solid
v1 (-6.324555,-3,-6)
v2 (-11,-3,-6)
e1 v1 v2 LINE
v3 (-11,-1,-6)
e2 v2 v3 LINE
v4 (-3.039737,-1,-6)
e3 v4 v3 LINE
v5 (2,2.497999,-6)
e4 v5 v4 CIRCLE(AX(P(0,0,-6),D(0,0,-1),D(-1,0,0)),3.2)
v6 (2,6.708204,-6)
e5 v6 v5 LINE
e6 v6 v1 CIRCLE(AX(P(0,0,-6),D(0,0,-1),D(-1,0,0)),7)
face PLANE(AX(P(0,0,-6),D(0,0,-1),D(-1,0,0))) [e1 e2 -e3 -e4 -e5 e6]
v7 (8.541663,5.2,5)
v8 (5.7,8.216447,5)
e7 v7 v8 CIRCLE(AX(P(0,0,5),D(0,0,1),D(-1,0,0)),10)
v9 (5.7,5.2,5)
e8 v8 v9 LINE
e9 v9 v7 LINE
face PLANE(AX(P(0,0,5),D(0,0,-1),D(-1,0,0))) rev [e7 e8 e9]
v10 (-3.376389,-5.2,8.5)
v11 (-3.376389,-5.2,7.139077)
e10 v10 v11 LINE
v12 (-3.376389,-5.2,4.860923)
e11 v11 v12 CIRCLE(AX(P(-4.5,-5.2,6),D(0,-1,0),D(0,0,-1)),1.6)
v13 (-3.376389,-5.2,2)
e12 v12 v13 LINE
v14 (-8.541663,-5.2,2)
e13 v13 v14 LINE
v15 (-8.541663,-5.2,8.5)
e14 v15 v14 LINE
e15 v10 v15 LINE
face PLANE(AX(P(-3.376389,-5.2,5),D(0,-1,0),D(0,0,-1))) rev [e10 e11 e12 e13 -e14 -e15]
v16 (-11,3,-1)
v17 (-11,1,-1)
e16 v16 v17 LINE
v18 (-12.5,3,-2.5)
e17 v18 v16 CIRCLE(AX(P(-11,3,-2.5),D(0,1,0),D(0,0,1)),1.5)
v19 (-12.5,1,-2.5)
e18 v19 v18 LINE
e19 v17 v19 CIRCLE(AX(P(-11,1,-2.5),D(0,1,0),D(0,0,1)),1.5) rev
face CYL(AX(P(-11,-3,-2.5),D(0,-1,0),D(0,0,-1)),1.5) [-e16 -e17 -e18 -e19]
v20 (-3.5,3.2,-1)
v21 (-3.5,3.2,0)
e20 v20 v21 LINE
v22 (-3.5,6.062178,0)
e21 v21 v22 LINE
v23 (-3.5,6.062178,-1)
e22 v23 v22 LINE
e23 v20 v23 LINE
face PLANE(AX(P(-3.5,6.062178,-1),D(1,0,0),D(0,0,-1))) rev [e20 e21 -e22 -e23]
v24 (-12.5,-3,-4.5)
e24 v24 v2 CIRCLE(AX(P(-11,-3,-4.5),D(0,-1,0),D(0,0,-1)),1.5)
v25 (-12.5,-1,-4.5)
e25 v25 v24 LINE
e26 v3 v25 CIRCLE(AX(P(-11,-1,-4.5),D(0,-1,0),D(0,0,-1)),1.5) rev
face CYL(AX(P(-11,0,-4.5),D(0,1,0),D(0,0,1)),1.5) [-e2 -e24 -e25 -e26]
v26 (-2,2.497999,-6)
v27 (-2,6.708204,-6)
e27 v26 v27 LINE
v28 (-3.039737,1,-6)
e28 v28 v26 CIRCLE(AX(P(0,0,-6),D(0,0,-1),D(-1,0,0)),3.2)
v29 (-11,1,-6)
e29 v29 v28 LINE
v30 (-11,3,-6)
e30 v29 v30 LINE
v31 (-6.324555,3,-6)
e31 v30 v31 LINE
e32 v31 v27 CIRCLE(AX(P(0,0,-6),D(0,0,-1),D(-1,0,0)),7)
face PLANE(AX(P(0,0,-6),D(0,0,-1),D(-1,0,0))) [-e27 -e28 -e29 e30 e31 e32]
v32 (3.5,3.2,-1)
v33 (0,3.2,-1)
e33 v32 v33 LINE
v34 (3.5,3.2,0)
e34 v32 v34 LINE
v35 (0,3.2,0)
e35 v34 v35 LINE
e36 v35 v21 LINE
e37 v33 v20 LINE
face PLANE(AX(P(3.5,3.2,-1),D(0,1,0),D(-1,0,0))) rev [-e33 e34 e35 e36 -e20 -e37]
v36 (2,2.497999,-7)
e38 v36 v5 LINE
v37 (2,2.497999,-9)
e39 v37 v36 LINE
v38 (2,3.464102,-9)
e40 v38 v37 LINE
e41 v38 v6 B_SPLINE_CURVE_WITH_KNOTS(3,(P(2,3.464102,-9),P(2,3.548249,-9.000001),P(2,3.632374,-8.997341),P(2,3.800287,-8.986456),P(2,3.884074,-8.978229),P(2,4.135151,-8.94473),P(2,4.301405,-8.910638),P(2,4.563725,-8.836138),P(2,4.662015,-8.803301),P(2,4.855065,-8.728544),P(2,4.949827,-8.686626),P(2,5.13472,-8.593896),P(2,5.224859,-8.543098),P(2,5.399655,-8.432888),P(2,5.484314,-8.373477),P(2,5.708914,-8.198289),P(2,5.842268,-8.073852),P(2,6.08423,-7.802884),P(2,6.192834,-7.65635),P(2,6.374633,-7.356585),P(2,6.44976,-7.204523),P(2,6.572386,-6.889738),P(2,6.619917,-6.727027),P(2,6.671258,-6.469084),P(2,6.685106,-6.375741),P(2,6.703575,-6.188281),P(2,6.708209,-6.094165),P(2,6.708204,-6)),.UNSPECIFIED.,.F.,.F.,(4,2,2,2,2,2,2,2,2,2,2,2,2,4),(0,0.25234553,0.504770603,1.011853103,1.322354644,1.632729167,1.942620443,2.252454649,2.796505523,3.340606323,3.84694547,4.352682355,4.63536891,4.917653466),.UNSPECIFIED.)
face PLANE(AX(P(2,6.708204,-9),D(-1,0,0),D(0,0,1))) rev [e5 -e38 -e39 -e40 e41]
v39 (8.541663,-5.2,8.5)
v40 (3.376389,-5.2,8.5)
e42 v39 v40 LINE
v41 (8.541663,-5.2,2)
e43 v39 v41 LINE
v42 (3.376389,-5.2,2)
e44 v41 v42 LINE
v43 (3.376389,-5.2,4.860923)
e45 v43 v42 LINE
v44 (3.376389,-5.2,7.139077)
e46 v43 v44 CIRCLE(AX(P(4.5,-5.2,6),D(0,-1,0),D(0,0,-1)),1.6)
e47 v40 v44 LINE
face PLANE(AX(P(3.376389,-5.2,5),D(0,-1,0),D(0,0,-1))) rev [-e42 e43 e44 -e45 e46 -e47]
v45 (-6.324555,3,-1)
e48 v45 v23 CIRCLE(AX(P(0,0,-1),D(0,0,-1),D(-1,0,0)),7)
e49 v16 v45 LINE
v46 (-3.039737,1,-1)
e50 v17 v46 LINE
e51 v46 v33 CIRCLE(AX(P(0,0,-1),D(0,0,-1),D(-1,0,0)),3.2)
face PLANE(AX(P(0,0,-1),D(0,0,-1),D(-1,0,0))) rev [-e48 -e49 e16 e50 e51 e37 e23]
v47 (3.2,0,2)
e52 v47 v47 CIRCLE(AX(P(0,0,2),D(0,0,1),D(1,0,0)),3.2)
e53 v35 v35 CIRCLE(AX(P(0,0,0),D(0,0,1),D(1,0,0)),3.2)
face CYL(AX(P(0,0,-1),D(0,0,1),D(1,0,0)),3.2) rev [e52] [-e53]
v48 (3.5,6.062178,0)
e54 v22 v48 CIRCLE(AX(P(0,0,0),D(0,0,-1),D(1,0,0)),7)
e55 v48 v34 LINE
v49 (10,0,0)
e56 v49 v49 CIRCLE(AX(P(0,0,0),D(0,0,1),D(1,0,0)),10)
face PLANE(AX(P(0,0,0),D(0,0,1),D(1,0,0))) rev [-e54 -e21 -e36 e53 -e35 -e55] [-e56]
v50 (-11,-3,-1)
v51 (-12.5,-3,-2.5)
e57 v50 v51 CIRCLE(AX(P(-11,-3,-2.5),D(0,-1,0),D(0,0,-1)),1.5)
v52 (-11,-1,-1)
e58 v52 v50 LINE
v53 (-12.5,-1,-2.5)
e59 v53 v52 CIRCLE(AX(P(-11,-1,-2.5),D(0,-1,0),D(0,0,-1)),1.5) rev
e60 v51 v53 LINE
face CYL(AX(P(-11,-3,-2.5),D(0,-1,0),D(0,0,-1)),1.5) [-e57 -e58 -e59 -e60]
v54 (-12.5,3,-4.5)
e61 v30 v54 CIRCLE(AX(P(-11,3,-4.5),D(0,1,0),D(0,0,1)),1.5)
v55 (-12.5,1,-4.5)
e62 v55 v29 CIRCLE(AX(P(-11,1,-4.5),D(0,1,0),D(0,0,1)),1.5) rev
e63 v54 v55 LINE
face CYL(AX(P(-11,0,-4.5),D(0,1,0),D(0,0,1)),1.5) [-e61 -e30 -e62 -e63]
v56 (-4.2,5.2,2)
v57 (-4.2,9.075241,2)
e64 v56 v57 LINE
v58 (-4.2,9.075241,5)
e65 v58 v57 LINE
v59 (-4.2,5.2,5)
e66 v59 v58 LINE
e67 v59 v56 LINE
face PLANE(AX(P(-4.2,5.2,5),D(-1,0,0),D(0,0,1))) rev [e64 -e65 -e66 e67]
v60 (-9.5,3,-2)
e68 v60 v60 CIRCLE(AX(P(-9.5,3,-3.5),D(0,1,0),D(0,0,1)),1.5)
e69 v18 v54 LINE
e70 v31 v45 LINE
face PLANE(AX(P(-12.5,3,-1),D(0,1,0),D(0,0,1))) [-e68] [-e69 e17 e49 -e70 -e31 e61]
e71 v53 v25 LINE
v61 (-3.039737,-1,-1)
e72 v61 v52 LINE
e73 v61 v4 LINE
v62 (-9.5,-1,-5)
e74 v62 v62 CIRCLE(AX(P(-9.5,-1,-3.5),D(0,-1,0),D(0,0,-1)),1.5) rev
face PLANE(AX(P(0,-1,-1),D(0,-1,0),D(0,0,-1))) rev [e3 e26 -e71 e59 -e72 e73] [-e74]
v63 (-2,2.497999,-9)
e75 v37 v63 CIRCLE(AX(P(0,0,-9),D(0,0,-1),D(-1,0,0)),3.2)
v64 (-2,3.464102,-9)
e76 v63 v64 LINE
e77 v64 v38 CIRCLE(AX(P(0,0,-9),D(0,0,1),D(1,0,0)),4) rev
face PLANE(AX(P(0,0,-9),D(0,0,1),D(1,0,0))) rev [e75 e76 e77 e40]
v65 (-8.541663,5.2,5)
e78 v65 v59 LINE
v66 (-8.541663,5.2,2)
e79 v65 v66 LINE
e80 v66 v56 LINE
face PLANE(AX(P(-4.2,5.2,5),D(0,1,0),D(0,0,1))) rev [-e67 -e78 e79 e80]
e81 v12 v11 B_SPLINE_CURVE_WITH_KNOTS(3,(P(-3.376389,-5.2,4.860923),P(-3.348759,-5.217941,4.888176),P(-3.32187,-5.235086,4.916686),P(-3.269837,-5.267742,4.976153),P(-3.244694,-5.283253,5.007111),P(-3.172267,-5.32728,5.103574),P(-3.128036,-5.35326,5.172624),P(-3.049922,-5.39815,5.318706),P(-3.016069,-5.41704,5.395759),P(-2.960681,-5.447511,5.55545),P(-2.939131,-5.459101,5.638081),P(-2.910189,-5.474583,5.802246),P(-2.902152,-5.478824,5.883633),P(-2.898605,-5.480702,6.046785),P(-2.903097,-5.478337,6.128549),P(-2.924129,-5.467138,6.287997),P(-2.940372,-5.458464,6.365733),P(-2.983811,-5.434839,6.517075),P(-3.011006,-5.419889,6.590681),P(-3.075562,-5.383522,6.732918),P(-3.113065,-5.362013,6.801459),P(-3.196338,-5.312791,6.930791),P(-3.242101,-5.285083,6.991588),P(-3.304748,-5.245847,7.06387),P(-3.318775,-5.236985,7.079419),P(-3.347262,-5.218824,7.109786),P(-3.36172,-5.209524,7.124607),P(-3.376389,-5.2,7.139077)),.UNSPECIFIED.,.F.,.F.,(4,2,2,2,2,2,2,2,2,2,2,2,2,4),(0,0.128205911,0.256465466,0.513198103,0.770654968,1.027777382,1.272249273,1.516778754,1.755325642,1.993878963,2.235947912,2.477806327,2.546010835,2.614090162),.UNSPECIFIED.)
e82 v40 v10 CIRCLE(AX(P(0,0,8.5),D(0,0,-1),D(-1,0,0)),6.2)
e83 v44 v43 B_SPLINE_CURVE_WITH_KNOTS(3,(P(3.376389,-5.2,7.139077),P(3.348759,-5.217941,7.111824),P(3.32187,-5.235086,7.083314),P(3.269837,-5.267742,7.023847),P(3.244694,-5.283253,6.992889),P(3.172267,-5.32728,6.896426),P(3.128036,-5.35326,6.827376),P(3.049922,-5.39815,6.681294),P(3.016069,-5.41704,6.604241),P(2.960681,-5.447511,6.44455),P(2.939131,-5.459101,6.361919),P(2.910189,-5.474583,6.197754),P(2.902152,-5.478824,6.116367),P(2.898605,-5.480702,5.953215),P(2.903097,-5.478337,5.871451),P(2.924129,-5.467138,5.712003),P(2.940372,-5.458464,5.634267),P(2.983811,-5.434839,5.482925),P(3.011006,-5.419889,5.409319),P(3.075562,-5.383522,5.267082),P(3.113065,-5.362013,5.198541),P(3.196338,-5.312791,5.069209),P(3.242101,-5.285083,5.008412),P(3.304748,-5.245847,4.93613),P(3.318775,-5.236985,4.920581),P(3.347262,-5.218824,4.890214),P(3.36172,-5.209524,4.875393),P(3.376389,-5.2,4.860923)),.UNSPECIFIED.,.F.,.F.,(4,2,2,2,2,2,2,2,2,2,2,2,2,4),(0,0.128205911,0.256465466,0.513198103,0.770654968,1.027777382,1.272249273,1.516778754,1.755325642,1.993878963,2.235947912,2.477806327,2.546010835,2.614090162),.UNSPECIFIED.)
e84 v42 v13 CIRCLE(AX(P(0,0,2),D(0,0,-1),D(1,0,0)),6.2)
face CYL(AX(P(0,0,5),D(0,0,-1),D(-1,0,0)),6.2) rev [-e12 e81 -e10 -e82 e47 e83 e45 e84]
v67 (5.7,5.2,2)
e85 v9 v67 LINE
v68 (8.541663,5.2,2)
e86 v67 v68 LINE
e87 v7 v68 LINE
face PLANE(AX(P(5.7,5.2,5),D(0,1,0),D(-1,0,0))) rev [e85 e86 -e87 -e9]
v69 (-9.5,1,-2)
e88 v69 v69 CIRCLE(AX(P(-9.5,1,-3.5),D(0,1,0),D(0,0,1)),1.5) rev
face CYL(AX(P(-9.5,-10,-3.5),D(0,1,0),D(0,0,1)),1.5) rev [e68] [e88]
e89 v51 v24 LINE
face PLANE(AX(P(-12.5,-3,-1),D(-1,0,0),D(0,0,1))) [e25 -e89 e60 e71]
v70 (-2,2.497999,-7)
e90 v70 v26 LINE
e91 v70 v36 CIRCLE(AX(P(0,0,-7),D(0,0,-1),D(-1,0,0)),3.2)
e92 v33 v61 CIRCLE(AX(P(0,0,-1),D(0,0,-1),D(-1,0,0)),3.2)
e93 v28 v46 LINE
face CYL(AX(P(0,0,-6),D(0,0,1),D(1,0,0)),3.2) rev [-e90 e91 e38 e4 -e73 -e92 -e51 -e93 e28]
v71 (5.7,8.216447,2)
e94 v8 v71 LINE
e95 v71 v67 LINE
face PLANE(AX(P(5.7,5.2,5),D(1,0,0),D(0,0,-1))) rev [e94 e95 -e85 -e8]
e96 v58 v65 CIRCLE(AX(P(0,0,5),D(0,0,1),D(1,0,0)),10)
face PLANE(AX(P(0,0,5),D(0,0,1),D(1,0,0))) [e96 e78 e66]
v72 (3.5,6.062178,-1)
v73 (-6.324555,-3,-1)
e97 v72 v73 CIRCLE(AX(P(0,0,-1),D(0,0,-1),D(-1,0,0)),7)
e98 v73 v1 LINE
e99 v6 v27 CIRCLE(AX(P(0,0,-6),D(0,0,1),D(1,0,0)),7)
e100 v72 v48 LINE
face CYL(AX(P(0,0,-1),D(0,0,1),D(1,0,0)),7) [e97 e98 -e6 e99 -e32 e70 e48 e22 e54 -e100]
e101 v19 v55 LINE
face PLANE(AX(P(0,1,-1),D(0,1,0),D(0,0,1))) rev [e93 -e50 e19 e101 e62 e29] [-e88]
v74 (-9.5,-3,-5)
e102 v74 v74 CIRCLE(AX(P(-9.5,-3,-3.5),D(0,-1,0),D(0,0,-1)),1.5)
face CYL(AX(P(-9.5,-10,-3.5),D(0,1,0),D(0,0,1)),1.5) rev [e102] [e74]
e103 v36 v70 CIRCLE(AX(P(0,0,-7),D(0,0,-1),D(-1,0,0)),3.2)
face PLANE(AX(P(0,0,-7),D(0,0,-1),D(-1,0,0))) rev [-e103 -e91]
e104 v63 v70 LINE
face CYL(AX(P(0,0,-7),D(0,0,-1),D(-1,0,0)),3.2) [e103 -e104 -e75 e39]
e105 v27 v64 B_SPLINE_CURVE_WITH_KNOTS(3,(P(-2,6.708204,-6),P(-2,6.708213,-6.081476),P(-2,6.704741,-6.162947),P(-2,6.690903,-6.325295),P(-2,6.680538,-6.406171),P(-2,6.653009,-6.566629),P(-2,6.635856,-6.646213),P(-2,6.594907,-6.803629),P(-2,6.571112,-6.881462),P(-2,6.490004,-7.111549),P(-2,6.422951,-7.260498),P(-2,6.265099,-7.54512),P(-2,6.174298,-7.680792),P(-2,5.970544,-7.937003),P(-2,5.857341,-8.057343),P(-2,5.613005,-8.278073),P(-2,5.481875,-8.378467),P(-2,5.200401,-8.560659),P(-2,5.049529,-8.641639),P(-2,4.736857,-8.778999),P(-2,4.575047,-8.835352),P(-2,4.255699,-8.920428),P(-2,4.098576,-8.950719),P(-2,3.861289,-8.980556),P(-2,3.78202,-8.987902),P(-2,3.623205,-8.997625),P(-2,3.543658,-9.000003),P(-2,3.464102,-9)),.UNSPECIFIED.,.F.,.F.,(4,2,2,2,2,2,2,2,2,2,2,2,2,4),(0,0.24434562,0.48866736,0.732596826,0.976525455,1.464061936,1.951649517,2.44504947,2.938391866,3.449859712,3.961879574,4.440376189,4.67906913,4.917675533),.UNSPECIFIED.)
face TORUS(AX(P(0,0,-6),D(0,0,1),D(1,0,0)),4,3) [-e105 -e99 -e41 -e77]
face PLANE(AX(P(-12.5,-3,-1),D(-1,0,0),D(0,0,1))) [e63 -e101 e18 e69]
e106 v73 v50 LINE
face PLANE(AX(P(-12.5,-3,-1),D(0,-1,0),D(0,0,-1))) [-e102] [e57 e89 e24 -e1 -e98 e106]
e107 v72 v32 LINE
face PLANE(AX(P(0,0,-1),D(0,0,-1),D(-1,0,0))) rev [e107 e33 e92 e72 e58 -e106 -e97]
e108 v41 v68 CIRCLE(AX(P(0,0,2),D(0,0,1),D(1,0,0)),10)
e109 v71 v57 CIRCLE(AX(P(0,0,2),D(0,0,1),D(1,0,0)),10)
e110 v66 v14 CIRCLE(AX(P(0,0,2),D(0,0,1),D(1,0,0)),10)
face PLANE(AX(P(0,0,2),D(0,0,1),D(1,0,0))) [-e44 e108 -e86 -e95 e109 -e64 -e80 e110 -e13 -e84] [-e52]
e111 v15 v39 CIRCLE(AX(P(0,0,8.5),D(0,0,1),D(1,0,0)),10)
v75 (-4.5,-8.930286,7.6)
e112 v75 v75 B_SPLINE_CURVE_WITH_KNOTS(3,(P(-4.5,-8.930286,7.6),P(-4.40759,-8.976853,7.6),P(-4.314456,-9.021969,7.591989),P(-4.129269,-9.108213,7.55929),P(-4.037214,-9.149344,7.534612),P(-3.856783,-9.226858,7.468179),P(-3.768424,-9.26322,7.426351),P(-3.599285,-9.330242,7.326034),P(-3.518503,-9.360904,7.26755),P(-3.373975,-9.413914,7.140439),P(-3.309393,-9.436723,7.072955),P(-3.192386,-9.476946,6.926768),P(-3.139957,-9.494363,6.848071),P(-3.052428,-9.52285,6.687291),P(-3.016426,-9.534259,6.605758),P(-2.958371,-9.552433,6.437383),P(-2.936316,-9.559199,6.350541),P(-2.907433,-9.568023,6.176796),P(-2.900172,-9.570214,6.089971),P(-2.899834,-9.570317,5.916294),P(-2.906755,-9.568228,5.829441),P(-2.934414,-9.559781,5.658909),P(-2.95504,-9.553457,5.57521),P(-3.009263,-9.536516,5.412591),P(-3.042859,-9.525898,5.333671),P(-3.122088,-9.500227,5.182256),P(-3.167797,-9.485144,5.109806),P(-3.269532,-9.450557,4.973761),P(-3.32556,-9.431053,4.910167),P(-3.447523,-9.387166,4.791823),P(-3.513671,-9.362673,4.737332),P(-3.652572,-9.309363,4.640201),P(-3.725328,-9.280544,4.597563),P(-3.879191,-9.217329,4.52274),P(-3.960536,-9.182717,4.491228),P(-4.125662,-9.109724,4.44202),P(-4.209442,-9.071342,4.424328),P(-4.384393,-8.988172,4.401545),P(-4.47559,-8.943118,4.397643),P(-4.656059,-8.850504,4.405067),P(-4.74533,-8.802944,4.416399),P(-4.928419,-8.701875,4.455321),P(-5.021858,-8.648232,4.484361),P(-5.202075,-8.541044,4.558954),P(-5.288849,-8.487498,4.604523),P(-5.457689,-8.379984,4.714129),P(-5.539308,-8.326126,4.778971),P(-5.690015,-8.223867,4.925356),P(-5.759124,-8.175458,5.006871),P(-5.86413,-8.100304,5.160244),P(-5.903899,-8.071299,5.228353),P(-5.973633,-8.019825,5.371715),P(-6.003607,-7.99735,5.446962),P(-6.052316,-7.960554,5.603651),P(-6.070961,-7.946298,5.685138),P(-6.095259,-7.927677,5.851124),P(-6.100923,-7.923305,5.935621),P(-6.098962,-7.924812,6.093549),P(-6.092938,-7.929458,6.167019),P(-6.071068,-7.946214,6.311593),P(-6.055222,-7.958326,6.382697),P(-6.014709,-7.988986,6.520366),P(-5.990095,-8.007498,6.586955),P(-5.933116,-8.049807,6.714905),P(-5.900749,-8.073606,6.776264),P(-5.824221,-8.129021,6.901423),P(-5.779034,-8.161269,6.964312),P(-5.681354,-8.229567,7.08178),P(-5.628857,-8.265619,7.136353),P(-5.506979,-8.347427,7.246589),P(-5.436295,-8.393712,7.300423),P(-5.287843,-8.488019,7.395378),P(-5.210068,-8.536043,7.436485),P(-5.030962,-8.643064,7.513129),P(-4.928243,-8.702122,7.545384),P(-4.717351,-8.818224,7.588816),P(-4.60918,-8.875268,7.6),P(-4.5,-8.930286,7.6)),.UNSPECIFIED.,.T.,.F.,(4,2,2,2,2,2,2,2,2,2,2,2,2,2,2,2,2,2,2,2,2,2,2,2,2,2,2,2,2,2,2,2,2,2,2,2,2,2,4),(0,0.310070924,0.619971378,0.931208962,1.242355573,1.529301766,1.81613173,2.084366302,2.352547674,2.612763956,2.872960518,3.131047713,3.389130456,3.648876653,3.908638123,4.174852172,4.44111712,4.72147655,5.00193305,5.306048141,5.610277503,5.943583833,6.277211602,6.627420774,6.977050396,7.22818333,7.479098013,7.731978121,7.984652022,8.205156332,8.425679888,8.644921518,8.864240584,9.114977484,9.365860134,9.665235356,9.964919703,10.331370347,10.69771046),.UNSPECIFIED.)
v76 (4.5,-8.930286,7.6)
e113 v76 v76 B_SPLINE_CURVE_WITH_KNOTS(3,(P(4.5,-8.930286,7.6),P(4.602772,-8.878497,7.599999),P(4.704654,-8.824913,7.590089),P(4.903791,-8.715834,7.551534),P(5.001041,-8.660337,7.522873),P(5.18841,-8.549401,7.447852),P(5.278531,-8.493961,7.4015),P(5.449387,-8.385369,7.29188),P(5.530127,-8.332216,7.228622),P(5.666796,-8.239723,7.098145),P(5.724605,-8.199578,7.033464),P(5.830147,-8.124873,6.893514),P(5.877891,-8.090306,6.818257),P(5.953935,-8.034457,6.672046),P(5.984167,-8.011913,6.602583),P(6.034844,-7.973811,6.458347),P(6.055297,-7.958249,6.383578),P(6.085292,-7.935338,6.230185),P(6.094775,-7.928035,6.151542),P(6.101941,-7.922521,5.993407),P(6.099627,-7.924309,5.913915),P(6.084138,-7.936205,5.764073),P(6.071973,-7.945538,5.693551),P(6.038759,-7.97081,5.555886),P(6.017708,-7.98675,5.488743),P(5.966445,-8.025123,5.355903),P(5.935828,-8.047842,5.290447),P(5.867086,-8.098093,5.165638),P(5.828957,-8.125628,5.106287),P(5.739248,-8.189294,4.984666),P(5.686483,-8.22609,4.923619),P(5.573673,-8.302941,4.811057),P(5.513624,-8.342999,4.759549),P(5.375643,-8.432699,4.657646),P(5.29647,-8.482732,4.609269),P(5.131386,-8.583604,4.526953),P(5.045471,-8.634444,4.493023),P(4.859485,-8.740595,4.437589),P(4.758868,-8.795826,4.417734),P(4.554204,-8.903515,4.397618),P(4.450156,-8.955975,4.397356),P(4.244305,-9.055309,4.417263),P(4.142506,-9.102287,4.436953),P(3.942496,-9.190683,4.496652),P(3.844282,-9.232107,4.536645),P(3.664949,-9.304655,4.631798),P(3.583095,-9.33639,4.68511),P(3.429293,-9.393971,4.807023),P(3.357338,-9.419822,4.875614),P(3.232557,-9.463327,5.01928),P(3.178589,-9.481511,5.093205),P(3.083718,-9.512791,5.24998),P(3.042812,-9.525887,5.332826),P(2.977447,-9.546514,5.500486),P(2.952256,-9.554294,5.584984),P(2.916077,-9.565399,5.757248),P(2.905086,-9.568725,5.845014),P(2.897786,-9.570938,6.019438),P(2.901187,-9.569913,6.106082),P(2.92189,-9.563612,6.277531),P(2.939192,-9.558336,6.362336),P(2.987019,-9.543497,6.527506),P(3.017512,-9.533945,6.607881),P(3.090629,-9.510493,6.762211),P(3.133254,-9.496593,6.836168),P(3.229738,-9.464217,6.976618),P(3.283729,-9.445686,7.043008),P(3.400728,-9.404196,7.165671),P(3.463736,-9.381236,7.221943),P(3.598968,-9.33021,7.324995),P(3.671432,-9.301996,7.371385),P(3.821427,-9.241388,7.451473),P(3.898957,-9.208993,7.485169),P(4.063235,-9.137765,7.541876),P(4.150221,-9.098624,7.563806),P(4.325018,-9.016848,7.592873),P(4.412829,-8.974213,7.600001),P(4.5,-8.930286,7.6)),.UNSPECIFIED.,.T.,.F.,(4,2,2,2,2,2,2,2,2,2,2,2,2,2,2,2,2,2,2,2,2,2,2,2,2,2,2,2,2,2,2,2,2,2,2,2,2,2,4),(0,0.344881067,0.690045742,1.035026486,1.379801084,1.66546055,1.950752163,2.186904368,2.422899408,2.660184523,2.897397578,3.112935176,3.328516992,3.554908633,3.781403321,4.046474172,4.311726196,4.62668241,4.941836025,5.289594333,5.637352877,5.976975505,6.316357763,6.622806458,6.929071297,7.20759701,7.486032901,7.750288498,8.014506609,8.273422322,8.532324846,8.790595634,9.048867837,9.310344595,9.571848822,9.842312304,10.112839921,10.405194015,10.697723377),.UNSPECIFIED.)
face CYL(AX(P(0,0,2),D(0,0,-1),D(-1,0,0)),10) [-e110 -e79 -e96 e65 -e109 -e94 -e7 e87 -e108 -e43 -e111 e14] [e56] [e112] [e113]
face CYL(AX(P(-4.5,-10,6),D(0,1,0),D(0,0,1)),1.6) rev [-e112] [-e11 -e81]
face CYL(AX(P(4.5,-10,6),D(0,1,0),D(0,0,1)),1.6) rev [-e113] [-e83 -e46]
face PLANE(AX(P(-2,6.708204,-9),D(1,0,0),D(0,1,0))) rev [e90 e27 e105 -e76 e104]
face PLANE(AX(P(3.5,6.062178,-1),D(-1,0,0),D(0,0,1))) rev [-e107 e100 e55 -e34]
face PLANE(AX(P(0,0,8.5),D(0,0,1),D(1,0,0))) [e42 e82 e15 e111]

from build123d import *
from build123d.topology import SkipClean

# Parameters (mm, degrees)
SKETCH_1_R          = 10
EXTRUDE_1_DEPTH     = 2
EXTRUDE_2_DEPTH     = 3
SKETCH_3_R          = 3.2
CUT_EXTRUDE_1_DEPTH = 3
EXTRUDE_3_DEPTH     = 1
SKETCH_6_R          = 7
SKETCH_6_R_2        = 3.2
EXTRUDE_4_DEPTH     = 5
SKETCH_7_W          = 8.062767077
SKETCH_7_H          = 6
EXTRUDE_5_DEPTH     = 5
SKETCH_8_R          = 1.5
CUT_EXTRUDE_3_DEPTH = 20.006577809
CUT_EXTRUDE_4_DEPTH = 5
FILLET_7_R          = 1.5
EXTRUDE_6_DEPTH     = 3
EXTRUDE_START       = -2
SKETCH_12_R         = 3.2
EXTRUDE_7_DEPTH     = 2
FILLET_8_R          = 3
EXTRUDE_8_DEPTH     = 3.5
SKETCH_14_R         = 1.6
CUT_EXTRUDE_5_DEPTH = 22.640009284


with BuildPart() as part:
    # 草图1 → 凸台-拉伸1 (new body)
    with BuildSketch(Plane.XY):
        Circle(SKETCH_1_R)
    extrude(amount=EXTRUDE_1_DEPTH)

    # 草图2 → 凸台-拉伸2 (add)
    with SkipClean():  # the faces are left unmerged after this step: merging them gives an invalid solid
        with BuildSketch(Plane.XY.offset(2)):
            with BuildLine():
                Line((3.376388603, -5.2), (8.541662602, -5.2))
                ThreePointArc((8.541662602, -5.2), (6.403471398, -7.680856336), (3.578411207, -9.337824866))
                ThreePointArc((3.578411207, -9.337824866), (-0.425231333, -9.990954825), (-4.358898944, -9))
                ThreePointArc((-4.358898944, -9), (-6.724293423, -7.401613199), (-8.541662602, -5.2))
                Line((-8.541662602, -5.2), (-3.376388603, -5.2))
                ThreePointArc((-3.376388603, -5.2), (0, -6.2), (3.376388603, -5.2))
            make_face()
            with BuildLine():
                Line((-4.2, 5.2), (-8.541662602, 5.2))
                ThreePointArc((-8.541662602, 5.2), (-6.658968745, 7.460438007), (-4.2, 9.075241044))
                Line((-4.2, 9.075241044), (-4.2, 5.2))
            make_face()
            with BuildLine():
                Line((5.7, 5.2), (8.541662602, 5.2))
                ThreePointArc((8.541662602, 5.2), (7.278803227, 6.857041897), (5.7, 8.216446921))
                Line((5.7, 8.216446921), (5.7, 5.2))
            make_face()
        extrude(amount=EXTRUDE_2_DEPTH)

    # 草图3 → 切除-拉伸1 (cut)
    with SkipClean():  # the faces are left unmerged after this step: merging them gives an invalid solid
        with BuildSketch(Plane.XY.offset(2)):
            Circle(SKETCH_3_R)
        extrude(amount=-CUT_EXTRUDE_1_DEPTH, mode=Mode.SUBTRACT)

    # 草图5 → 凸台-拉伸3 (add)
    with SkipClean():  # the faces are left unmerged after this step: merging them gives an invalid solid
        with BuildSketch(Plane(origin=(0, 0, 0), x_dir=(-1, 0, 0), z_dir=(0, 0, -1))):
            with BuildLine():
                Line((-3.5, 6.062177826), (-3.5, 3.2))
                Line((-3.5, 3.2), (3.5, 3.2))
                Line((3.5, 3.2), (3.5, 6.062177826))
                ThreePointArc((3.5, 6.062177826), (0, 7), (-3.5, 6.062177826))
            make_face()
        extrude(amount=EXTRUDE_3_DEPTH)

    # 草图6 → 凸台-拉伸4 (add)
    with SkipClean():  # the faces are left unmerged after this step: merging them gives an invalid solid
        with BuildSketch(Plane(origin=(0, 0, -1), x_dir=(-1, 0, 0), z_dir=(0, 0, -1))):
            with Locations(Location((0, 0, 0), (0, 0, 120))):
                Circle(SKETCH_6_R)
            with Locations(Location((0, 0, 0), (0, 0, 180))):
                Circle(SKETCH_6_R_2, mode=Mode.SUBTRACT)
        extrude(amount=EXTRUDE_4_DEPTH)

    # 草图7 → 凸台-拉伸5 (add)
    with SkipClean():  # the faces are left unmerged after this step: merging them gives an invalid solid
        with BuildSketch(Plane(origin=(0, 0, -6), x_dir=(-1, 0, 0), z_dir=(0, 0, -1))):
            with Locations((8.468616461, 0)):
                Rectangle(SKETCH_7_W, SKETCH_7_H)
        extrude(amount=-EXTRUDE_5_DEPTH)

    # 草图8 → 切除-拉伸3 (cut, through all)
    with SkipClean():  # the faces are left unmerged after this step: merging them gives an invalid solid
        with BuildSketch(Plane(origin=(0, 3, 0), x_dir=(1, 0, 0), z_dir=(0, 1, 0))):
            with Locations(Location((-9.5, 3.5, 0), (0, 0, 270))):
                Circle(SKETCH_8_R)
        extrude(amount=-CUT_EXTRUDE_3_DEPTH, mode=Mode.SUBTRACT)

    # 草图9 → 切除-拉伸4 (cut)
    with SkipClean():  # the faces are left unmerged after this step: merging them gives an invalid solid
        with BuildSketch(Plane(origin=(0, 0, -6), x_dir=(-1, 0, 0), z_dir=(0, 0, -1))):
            Polygon((0, 0), (0, 1), (12.5, 1), (12.5, -1), (0, -1), align=None)
        extrude(amount=-CUT_EXTRUDE_4_DEPTH, mode=Mode.SUBTRACT)

    # 圆角7
    fillet_7_edges = [part.edges().sort_by_distance(p)[0] for p in [
        (-12.5, 2, -1),
        (-12.5, -2, -1),
        (-12.5, -2, -6),
        (-12.5, 2, -6),
    ]]
    fillet(fillet_7_edges, radius=FILLET_7_R)

    # 草图10 → 凸台-拉伸6 (add)
    with BuildSketch(Plane(origin=(0, 0, -6), x_dir=(-1, 0, 0), z_dir=(0, 0, -1))):
        with BuildLine():
            Line((2, 6.708203932), (2, 2.497999199))
            ThreePointArc((2, 2.497999199), (0, 3.2), (-2, 2.497999199))
            Line((-2, 2.497999199), (-2, 6.708203932))
            ThreePointArc((-2, 6.708203932), (0, 7), (2, 6.708203932))
        make_face()
    extrude(amount=EXTRUDE_6_DEPTH)

    # 草图12 → 凸台-拉伸7 (add)
    with BuildSketch(Plane(origin=(0, 0, -9), x_dir=(-1, 0, 0), z_dir=(0, 0, -1)).offset(EXTRUDE_START)):
        with Locations(Location((0, 0, 0), (0, 0, 180))):
            Circle(SKETCH_12_R)
    extrude(amount=EXTRUDE_7_DEPTH)

    # 圆角8
    fillet_8_edges = [part.edges().sort_by_distance(p)[0] for p in [
        (0, 7, -9),
    ]]
    fillet(fillet_8_edges, radius=FILLET_8_R - 0.0001)  # a hair under: the kernel refuses the full size

    # 草图13 → 凸台-拉伸8 (add)
    with BuildSketch(Plane.XY.offset(5)):
        with BuildLine():
            Line((3.376388603, -5.2), (8.541662602, -5.2))
            ThreePointArc((8.541662602, -5.2), (0, -10), (-8.541662602, -5.2))
            Line((-8.541662602, -5.2), (-3.376388603, -5.2))
            ThreePointArc((-3.376388603, -5.2), (0, -6.2), (3.376388603, -5.2))
        make_face()
    extrude(amount=EXTRUDE_8_DEPTH)

    # 草图14 → 切除-拉伸5 (cut, through all)
    with BuildSketch(Plane(origin=(0, -5.2, 0), x_dir=(1, 0, 0), z_dir=(0, 1, 0))):
        with Locations(Location((4.5, -6, 0), (0, 0, 270))):
            Circle(SKETCH_14_R)
        with Locations(Location((-4.5, -6, 0), (0, 0, 270))):
            Circle(SKETCH_14_R)
    extrude(amount=-CUT_EXTRUDE_5_DEPTH, mode=Mode.SUBTRACT)


solid = part.part
